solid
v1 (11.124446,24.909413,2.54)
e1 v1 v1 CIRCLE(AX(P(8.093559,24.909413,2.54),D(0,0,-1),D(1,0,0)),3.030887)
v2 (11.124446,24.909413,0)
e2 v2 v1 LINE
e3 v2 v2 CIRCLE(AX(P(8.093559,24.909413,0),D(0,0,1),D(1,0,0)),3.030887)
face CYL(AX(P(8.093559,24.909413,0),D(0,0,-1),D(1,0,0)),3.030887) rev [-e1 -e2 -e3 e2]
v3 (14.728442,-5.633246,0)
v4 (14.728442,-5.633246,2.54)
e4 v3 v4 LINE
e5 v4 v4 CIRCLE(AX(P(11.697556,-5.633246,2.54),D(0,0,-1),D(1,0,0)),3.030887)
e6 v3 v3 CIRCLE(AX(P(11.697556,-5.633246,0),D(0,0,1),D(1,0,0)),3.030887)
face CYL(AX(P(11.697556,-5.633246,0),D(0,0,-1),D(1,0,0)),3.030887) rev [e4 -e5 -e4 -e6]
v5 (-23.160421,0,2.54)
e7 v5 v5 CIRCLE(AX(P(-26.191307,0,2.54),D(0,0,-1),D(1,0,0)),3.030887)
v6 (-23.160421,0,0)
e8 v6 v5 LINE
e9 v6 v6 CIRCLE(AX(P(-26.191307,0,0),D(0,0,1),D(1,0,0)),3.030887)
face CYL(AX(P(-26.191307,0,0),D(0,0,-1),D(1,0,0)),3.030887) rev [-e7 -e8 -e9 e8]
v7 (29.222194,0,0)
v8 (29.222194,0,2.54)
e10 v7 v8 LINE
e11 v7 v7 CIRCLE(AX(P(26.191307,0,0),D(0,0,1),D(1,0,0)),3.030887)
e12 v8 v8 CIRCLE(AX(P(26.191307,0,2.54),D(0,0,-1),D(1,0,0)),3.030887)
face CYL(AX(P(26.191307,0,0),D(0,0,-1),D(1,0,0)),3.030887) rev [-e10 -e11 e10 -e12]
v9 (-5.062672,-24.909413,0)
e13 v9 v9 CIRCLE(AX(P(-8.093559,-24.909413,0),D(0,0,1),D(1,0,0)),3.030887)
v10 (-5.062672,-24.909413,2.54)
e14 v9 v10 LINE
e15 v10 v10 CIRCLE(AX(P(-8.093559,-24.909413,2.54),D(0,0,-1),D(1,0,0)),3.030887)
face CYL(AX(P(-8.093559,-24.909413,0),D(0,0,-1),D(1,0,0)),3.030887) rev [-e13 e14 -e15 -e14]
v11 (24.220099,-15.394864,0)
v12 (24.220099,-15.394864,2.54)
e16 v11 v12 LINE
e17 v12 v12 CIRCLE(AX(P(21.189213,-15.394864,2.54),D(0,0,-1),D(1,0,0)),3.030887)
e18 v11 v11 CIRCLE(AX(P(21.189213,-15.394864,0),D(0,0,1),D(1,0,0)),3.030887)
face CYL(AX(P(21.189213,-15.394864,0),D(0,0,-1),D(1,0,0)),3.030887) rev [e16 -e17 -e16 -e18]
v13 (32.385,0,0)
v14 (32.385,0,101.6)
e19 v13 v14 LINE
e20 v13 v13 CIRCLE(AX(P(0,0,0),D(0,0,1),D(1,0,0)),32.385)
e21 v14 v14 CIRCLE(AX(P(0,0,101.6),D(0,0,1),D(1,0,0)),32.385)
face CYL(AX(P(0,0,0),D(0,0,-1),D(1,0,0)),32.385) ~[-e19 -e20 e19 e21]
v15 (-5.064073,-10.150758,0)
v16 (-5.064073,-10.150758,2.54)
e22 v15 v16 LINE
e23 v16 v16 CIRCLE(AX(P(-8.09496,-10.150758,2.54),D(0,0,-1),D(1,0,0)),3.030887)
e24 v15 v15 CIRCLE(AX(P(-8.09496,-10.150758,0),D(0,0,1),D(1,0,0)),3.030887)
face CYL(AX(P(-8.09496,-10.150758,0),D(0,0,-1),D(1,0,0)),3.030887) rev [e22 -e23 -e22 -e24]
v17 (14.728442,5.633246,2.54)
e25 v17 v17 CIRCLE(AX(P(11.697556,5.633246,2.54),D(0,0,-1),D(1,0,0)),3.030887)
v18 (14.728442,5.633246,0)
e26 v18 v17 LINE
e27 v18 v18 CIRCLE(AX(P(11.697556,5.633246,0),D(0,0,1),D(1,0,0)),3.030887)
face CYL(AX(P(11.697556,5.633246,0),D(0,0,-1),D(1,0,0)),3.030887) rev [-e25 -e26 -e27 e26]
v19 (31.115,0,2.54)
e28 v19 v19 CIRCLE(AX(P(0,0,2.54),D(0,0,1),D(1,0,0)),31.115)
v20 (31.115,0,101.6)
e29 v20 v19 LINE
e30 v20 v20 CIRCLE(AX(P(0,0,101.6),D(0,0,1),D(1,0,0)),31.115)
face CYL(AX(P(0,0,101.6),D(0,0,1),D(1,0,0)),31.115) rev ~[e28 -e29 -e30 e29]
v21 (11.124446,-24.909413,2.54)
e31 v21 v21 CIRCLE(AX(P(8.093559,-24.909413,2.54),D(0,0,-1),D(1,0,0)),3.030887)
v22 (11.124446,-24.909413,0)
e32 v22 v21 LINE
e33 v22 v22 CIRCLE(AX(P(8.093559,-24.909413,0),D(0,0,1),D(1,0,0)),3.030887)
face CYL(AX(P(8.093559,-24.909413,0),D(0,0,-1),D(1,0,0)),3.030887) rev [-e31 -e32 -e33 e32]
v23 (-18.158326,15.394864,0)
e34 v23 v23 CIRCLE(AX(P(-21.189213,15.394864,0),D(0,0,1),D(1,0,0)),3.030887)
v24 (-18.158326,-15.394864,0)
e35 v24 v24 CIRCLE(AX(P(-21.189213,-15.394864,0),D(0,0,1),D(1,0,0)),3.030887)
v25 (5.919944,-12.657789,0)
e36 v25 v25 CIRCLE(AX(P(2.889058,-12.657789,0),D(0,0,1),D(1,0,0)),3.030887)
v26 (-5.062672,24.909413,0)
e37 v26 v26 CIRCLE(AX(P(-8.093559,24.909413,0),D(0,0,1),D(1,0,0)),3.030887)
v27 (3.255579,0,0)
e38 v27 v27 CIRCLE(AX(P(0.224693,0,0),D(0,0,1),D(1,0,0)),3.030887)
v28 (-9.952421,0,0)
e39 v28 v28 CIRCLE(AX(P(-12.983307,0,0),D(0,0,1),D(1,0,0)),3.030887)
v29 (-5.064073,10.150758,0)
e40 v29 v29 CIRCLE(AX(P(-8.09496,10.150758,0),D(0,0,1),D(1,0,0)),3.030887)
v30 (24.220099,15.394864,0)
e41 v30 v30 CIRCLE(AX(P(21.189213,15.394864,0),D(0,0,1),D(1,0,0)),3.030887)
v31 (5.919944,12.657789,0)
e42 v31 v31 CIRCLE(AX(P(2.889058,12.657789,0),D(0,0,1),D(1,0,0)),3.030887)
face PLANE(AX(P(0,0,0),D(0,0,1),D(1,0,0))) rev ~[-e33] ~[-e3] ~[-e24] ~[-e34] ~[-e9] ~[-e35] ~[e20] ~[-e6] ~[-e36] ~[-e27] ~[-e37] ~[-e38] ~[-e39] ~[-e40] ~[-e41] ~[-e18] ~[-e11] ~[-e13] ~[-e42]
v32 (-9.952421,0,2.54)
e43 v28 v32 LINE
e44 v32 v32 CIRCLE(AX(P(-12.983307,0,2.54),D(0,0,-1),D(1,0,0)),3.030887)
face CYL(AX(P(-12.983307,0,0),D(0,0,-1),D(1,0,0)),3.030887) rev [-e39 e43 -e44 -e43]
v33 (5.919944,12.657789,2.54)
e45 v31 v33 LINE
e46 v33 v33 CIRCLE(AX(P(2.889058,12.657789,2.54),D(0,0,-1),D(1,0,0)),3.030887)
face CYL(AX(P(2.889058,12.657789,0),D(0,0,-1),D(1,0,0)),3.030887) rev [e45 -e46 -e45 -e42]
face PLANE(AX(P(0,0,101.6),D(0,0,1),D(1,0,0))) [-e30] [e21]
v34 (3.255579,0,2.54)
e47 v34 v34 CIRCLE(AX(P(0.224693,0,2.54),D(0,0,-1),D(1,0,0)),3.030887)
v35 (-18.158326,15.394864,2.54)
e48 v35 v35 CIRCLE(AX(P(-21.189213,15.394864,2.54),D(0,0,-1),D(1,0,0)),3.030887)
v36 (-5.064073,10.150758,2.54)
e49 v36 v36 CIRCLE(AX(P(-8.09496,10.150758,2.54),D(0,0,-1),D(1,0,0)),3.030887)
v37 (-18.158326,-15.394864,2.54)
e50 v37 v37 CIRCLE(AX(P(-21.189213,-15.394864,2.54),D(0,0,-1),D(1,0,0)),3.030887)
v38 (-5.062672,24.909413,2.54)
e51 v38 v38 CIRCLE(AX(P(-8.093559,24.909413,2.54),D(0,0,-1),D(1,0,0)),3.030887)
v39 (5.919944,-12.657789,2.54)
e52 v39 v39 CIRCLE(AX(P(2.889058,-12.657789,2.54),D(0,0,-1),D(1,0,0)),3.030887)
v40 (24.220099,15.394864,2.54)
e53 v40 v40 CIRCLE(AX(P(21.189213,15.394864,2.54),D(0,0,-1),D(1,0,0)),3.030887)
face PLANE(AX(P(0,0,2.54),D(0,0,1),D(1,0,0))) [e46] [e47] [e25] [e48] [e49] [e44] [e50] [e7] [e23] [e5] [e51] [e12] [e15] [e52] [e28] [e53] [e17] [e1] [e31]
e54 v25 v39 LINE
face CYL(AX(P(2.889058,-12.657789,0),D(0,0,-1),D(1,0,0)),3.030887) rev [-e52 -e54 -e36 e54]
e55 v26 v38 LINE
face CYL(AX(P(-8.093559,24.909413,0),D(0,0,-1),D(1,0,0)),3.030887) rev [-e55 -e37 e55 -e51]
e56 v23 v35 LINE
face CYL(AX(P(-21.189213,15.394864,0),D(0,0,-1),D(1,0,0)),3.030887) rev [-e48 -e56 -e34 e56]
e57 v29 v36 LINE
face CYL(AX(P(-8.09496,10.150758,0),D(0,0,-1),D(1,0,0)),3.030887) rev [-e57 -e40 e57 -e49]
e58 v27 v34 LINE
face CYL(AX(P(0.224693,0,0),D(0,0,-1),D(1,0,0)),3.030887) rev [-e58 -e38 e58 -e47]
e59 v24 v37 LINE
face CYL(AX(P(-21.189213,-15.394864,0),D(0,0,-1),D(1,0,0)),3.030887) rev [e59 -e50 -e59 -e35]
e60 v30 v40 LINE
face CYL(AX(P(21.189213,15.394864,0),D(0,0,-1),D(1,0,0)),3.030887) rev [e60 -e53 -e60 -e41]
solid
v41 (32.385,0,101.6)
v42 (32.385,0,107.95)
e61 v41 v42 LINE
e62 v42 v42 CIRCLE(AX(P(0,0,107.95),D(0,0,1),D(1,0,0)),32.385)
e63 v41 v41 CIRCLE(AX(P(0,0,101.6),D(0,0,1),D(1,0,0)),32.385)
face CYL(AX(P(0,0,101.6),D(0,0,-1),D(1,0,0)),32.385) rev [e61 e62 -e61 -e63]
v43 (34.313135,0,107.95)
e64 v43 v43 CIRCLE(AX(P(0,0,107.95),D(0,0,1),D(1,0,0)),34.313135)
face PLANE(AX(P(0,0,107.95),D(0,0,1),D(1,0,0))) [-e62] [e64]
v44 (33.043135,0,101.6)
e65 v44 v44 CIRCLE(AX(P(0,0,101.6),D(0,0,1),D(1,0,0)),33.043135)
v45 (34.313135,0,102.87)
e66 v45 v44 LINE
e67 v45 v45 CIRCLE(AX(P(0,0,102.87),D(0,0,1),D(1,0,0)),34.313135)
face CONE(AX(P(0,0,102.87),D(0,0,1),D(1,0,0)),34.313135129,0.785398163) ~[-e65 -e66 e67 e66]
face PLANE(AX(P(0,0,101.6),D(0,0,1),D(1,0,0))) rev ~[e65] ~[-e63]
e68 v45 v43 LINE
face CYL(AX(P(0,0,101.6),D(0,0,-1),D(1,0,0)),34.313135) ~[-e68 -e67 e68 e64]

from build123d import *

# Parameters (mm, degrees)
F0_R          = 32.385
F1_DEPTH      = 101.6
F2_R          = 31.115
F3_DEPTH      = 99.06
F4_R          = 3.0308866689
F5_DEPTH      = 88.9
F5_DEPTH_BACK = 6.35
F6_R          = 34.3131351295
F6_R_2        = 32.385
F7_DEPTH      = 6.35
F8_SIZE       = 1.27


with BuildPart() as f1:
    # F0 (on Top) → F1 (new body)
    with BuildSketch(Plane.XY):
        Circle(F0_R)
    extrude(amount=F1_DEPTH)

    # F2 (on face) → F3 (cut)
    with BuildSketch(Plane.XY.offset(101.6)):
        Circle(F2_R)
    extrude(amount=-F3_DEPTH, mode=Mode.SUBTRACT)

    # F4 (on face) → F5 (cut, two sides)
    with BuildSketch(Plane.XY) as f5_sk:
        with Locations((-26.1913072318, 0)):
            Circle(F4_R)
        with Locations((-12.9833072318, 0)):
            Circle(F4_R)
        with Locations((0.2246927682, 0)):
            Circle(F4_R)
        with Locations((-21.1892126554, -15.3948641291)):
            Circle(F4_R)
        with Locations((-8.0935590395, -24.9094134131)):
            Circle(F4_R)
        with Locations((8.0935590395, -24.9094134131)):
            Circle(F4_R)
        with Locations((21.1892126554, -15.3948641291)):
            Circle(F4_R)
        with Locations((26.1913072318, 0)):
            Circle(F4_R)
        with Locations((21.1892126554, 15.3948641291)):
            Circle(F4_R)
        with Locations((8.0935590395, 24.9094134131)):
            Circle(F4_R)
        with Locations((-8.0935590395, 24.9094134131)):
            Circle(F4_R)
        with Locations((-21.1892126554, 15.3948641291)):
            Circle(F4_R)
        with Locations((-8.0949596534, -10.1507583404)):
            Circle(F4_R)
        with Locations((2.8890576511, -12.6577886127)):
            Circle(F4_R)
        with Locations((11.6975556182, -5.6332458878)):
            Circle(F4_R)
        with Locations((11.6975556182, 5.6332458878)):
            Circle(F4_R)
        with Locations((2.8890576511, 12.6577886127)):
            Circle(F4_R)
        with Locations((-8.0949596534, 10.1507583404)):
            Circle(F4_R)
    extrude(amount=-F5_DEPTH, mode=Mode.SUBTRACT)
    extrude(f5_sk.sketch, amount=F5_DEPTH_BACK, mode=Mode.SUBTRACT)


with BuildPart() as f7:
    # F6 (on face) → F7 (new body)
    with BuildSketch(Plane.XY.offset(101.6)):
        Circle(F6_R)
        Circle(F6_R_2, mode=Mode.SUBTRACT)
    extrude(amount=F7_DEPTH)

    # F8
    f8_edges = [f7.edges().sort_by_distance(p)[0] for p in [
        (-34.313135, 0, 101.6),
    ]]
    chamfer(f8_edges, length=F8_SIZE)


solid = Compound([f1.part, f7.part])
